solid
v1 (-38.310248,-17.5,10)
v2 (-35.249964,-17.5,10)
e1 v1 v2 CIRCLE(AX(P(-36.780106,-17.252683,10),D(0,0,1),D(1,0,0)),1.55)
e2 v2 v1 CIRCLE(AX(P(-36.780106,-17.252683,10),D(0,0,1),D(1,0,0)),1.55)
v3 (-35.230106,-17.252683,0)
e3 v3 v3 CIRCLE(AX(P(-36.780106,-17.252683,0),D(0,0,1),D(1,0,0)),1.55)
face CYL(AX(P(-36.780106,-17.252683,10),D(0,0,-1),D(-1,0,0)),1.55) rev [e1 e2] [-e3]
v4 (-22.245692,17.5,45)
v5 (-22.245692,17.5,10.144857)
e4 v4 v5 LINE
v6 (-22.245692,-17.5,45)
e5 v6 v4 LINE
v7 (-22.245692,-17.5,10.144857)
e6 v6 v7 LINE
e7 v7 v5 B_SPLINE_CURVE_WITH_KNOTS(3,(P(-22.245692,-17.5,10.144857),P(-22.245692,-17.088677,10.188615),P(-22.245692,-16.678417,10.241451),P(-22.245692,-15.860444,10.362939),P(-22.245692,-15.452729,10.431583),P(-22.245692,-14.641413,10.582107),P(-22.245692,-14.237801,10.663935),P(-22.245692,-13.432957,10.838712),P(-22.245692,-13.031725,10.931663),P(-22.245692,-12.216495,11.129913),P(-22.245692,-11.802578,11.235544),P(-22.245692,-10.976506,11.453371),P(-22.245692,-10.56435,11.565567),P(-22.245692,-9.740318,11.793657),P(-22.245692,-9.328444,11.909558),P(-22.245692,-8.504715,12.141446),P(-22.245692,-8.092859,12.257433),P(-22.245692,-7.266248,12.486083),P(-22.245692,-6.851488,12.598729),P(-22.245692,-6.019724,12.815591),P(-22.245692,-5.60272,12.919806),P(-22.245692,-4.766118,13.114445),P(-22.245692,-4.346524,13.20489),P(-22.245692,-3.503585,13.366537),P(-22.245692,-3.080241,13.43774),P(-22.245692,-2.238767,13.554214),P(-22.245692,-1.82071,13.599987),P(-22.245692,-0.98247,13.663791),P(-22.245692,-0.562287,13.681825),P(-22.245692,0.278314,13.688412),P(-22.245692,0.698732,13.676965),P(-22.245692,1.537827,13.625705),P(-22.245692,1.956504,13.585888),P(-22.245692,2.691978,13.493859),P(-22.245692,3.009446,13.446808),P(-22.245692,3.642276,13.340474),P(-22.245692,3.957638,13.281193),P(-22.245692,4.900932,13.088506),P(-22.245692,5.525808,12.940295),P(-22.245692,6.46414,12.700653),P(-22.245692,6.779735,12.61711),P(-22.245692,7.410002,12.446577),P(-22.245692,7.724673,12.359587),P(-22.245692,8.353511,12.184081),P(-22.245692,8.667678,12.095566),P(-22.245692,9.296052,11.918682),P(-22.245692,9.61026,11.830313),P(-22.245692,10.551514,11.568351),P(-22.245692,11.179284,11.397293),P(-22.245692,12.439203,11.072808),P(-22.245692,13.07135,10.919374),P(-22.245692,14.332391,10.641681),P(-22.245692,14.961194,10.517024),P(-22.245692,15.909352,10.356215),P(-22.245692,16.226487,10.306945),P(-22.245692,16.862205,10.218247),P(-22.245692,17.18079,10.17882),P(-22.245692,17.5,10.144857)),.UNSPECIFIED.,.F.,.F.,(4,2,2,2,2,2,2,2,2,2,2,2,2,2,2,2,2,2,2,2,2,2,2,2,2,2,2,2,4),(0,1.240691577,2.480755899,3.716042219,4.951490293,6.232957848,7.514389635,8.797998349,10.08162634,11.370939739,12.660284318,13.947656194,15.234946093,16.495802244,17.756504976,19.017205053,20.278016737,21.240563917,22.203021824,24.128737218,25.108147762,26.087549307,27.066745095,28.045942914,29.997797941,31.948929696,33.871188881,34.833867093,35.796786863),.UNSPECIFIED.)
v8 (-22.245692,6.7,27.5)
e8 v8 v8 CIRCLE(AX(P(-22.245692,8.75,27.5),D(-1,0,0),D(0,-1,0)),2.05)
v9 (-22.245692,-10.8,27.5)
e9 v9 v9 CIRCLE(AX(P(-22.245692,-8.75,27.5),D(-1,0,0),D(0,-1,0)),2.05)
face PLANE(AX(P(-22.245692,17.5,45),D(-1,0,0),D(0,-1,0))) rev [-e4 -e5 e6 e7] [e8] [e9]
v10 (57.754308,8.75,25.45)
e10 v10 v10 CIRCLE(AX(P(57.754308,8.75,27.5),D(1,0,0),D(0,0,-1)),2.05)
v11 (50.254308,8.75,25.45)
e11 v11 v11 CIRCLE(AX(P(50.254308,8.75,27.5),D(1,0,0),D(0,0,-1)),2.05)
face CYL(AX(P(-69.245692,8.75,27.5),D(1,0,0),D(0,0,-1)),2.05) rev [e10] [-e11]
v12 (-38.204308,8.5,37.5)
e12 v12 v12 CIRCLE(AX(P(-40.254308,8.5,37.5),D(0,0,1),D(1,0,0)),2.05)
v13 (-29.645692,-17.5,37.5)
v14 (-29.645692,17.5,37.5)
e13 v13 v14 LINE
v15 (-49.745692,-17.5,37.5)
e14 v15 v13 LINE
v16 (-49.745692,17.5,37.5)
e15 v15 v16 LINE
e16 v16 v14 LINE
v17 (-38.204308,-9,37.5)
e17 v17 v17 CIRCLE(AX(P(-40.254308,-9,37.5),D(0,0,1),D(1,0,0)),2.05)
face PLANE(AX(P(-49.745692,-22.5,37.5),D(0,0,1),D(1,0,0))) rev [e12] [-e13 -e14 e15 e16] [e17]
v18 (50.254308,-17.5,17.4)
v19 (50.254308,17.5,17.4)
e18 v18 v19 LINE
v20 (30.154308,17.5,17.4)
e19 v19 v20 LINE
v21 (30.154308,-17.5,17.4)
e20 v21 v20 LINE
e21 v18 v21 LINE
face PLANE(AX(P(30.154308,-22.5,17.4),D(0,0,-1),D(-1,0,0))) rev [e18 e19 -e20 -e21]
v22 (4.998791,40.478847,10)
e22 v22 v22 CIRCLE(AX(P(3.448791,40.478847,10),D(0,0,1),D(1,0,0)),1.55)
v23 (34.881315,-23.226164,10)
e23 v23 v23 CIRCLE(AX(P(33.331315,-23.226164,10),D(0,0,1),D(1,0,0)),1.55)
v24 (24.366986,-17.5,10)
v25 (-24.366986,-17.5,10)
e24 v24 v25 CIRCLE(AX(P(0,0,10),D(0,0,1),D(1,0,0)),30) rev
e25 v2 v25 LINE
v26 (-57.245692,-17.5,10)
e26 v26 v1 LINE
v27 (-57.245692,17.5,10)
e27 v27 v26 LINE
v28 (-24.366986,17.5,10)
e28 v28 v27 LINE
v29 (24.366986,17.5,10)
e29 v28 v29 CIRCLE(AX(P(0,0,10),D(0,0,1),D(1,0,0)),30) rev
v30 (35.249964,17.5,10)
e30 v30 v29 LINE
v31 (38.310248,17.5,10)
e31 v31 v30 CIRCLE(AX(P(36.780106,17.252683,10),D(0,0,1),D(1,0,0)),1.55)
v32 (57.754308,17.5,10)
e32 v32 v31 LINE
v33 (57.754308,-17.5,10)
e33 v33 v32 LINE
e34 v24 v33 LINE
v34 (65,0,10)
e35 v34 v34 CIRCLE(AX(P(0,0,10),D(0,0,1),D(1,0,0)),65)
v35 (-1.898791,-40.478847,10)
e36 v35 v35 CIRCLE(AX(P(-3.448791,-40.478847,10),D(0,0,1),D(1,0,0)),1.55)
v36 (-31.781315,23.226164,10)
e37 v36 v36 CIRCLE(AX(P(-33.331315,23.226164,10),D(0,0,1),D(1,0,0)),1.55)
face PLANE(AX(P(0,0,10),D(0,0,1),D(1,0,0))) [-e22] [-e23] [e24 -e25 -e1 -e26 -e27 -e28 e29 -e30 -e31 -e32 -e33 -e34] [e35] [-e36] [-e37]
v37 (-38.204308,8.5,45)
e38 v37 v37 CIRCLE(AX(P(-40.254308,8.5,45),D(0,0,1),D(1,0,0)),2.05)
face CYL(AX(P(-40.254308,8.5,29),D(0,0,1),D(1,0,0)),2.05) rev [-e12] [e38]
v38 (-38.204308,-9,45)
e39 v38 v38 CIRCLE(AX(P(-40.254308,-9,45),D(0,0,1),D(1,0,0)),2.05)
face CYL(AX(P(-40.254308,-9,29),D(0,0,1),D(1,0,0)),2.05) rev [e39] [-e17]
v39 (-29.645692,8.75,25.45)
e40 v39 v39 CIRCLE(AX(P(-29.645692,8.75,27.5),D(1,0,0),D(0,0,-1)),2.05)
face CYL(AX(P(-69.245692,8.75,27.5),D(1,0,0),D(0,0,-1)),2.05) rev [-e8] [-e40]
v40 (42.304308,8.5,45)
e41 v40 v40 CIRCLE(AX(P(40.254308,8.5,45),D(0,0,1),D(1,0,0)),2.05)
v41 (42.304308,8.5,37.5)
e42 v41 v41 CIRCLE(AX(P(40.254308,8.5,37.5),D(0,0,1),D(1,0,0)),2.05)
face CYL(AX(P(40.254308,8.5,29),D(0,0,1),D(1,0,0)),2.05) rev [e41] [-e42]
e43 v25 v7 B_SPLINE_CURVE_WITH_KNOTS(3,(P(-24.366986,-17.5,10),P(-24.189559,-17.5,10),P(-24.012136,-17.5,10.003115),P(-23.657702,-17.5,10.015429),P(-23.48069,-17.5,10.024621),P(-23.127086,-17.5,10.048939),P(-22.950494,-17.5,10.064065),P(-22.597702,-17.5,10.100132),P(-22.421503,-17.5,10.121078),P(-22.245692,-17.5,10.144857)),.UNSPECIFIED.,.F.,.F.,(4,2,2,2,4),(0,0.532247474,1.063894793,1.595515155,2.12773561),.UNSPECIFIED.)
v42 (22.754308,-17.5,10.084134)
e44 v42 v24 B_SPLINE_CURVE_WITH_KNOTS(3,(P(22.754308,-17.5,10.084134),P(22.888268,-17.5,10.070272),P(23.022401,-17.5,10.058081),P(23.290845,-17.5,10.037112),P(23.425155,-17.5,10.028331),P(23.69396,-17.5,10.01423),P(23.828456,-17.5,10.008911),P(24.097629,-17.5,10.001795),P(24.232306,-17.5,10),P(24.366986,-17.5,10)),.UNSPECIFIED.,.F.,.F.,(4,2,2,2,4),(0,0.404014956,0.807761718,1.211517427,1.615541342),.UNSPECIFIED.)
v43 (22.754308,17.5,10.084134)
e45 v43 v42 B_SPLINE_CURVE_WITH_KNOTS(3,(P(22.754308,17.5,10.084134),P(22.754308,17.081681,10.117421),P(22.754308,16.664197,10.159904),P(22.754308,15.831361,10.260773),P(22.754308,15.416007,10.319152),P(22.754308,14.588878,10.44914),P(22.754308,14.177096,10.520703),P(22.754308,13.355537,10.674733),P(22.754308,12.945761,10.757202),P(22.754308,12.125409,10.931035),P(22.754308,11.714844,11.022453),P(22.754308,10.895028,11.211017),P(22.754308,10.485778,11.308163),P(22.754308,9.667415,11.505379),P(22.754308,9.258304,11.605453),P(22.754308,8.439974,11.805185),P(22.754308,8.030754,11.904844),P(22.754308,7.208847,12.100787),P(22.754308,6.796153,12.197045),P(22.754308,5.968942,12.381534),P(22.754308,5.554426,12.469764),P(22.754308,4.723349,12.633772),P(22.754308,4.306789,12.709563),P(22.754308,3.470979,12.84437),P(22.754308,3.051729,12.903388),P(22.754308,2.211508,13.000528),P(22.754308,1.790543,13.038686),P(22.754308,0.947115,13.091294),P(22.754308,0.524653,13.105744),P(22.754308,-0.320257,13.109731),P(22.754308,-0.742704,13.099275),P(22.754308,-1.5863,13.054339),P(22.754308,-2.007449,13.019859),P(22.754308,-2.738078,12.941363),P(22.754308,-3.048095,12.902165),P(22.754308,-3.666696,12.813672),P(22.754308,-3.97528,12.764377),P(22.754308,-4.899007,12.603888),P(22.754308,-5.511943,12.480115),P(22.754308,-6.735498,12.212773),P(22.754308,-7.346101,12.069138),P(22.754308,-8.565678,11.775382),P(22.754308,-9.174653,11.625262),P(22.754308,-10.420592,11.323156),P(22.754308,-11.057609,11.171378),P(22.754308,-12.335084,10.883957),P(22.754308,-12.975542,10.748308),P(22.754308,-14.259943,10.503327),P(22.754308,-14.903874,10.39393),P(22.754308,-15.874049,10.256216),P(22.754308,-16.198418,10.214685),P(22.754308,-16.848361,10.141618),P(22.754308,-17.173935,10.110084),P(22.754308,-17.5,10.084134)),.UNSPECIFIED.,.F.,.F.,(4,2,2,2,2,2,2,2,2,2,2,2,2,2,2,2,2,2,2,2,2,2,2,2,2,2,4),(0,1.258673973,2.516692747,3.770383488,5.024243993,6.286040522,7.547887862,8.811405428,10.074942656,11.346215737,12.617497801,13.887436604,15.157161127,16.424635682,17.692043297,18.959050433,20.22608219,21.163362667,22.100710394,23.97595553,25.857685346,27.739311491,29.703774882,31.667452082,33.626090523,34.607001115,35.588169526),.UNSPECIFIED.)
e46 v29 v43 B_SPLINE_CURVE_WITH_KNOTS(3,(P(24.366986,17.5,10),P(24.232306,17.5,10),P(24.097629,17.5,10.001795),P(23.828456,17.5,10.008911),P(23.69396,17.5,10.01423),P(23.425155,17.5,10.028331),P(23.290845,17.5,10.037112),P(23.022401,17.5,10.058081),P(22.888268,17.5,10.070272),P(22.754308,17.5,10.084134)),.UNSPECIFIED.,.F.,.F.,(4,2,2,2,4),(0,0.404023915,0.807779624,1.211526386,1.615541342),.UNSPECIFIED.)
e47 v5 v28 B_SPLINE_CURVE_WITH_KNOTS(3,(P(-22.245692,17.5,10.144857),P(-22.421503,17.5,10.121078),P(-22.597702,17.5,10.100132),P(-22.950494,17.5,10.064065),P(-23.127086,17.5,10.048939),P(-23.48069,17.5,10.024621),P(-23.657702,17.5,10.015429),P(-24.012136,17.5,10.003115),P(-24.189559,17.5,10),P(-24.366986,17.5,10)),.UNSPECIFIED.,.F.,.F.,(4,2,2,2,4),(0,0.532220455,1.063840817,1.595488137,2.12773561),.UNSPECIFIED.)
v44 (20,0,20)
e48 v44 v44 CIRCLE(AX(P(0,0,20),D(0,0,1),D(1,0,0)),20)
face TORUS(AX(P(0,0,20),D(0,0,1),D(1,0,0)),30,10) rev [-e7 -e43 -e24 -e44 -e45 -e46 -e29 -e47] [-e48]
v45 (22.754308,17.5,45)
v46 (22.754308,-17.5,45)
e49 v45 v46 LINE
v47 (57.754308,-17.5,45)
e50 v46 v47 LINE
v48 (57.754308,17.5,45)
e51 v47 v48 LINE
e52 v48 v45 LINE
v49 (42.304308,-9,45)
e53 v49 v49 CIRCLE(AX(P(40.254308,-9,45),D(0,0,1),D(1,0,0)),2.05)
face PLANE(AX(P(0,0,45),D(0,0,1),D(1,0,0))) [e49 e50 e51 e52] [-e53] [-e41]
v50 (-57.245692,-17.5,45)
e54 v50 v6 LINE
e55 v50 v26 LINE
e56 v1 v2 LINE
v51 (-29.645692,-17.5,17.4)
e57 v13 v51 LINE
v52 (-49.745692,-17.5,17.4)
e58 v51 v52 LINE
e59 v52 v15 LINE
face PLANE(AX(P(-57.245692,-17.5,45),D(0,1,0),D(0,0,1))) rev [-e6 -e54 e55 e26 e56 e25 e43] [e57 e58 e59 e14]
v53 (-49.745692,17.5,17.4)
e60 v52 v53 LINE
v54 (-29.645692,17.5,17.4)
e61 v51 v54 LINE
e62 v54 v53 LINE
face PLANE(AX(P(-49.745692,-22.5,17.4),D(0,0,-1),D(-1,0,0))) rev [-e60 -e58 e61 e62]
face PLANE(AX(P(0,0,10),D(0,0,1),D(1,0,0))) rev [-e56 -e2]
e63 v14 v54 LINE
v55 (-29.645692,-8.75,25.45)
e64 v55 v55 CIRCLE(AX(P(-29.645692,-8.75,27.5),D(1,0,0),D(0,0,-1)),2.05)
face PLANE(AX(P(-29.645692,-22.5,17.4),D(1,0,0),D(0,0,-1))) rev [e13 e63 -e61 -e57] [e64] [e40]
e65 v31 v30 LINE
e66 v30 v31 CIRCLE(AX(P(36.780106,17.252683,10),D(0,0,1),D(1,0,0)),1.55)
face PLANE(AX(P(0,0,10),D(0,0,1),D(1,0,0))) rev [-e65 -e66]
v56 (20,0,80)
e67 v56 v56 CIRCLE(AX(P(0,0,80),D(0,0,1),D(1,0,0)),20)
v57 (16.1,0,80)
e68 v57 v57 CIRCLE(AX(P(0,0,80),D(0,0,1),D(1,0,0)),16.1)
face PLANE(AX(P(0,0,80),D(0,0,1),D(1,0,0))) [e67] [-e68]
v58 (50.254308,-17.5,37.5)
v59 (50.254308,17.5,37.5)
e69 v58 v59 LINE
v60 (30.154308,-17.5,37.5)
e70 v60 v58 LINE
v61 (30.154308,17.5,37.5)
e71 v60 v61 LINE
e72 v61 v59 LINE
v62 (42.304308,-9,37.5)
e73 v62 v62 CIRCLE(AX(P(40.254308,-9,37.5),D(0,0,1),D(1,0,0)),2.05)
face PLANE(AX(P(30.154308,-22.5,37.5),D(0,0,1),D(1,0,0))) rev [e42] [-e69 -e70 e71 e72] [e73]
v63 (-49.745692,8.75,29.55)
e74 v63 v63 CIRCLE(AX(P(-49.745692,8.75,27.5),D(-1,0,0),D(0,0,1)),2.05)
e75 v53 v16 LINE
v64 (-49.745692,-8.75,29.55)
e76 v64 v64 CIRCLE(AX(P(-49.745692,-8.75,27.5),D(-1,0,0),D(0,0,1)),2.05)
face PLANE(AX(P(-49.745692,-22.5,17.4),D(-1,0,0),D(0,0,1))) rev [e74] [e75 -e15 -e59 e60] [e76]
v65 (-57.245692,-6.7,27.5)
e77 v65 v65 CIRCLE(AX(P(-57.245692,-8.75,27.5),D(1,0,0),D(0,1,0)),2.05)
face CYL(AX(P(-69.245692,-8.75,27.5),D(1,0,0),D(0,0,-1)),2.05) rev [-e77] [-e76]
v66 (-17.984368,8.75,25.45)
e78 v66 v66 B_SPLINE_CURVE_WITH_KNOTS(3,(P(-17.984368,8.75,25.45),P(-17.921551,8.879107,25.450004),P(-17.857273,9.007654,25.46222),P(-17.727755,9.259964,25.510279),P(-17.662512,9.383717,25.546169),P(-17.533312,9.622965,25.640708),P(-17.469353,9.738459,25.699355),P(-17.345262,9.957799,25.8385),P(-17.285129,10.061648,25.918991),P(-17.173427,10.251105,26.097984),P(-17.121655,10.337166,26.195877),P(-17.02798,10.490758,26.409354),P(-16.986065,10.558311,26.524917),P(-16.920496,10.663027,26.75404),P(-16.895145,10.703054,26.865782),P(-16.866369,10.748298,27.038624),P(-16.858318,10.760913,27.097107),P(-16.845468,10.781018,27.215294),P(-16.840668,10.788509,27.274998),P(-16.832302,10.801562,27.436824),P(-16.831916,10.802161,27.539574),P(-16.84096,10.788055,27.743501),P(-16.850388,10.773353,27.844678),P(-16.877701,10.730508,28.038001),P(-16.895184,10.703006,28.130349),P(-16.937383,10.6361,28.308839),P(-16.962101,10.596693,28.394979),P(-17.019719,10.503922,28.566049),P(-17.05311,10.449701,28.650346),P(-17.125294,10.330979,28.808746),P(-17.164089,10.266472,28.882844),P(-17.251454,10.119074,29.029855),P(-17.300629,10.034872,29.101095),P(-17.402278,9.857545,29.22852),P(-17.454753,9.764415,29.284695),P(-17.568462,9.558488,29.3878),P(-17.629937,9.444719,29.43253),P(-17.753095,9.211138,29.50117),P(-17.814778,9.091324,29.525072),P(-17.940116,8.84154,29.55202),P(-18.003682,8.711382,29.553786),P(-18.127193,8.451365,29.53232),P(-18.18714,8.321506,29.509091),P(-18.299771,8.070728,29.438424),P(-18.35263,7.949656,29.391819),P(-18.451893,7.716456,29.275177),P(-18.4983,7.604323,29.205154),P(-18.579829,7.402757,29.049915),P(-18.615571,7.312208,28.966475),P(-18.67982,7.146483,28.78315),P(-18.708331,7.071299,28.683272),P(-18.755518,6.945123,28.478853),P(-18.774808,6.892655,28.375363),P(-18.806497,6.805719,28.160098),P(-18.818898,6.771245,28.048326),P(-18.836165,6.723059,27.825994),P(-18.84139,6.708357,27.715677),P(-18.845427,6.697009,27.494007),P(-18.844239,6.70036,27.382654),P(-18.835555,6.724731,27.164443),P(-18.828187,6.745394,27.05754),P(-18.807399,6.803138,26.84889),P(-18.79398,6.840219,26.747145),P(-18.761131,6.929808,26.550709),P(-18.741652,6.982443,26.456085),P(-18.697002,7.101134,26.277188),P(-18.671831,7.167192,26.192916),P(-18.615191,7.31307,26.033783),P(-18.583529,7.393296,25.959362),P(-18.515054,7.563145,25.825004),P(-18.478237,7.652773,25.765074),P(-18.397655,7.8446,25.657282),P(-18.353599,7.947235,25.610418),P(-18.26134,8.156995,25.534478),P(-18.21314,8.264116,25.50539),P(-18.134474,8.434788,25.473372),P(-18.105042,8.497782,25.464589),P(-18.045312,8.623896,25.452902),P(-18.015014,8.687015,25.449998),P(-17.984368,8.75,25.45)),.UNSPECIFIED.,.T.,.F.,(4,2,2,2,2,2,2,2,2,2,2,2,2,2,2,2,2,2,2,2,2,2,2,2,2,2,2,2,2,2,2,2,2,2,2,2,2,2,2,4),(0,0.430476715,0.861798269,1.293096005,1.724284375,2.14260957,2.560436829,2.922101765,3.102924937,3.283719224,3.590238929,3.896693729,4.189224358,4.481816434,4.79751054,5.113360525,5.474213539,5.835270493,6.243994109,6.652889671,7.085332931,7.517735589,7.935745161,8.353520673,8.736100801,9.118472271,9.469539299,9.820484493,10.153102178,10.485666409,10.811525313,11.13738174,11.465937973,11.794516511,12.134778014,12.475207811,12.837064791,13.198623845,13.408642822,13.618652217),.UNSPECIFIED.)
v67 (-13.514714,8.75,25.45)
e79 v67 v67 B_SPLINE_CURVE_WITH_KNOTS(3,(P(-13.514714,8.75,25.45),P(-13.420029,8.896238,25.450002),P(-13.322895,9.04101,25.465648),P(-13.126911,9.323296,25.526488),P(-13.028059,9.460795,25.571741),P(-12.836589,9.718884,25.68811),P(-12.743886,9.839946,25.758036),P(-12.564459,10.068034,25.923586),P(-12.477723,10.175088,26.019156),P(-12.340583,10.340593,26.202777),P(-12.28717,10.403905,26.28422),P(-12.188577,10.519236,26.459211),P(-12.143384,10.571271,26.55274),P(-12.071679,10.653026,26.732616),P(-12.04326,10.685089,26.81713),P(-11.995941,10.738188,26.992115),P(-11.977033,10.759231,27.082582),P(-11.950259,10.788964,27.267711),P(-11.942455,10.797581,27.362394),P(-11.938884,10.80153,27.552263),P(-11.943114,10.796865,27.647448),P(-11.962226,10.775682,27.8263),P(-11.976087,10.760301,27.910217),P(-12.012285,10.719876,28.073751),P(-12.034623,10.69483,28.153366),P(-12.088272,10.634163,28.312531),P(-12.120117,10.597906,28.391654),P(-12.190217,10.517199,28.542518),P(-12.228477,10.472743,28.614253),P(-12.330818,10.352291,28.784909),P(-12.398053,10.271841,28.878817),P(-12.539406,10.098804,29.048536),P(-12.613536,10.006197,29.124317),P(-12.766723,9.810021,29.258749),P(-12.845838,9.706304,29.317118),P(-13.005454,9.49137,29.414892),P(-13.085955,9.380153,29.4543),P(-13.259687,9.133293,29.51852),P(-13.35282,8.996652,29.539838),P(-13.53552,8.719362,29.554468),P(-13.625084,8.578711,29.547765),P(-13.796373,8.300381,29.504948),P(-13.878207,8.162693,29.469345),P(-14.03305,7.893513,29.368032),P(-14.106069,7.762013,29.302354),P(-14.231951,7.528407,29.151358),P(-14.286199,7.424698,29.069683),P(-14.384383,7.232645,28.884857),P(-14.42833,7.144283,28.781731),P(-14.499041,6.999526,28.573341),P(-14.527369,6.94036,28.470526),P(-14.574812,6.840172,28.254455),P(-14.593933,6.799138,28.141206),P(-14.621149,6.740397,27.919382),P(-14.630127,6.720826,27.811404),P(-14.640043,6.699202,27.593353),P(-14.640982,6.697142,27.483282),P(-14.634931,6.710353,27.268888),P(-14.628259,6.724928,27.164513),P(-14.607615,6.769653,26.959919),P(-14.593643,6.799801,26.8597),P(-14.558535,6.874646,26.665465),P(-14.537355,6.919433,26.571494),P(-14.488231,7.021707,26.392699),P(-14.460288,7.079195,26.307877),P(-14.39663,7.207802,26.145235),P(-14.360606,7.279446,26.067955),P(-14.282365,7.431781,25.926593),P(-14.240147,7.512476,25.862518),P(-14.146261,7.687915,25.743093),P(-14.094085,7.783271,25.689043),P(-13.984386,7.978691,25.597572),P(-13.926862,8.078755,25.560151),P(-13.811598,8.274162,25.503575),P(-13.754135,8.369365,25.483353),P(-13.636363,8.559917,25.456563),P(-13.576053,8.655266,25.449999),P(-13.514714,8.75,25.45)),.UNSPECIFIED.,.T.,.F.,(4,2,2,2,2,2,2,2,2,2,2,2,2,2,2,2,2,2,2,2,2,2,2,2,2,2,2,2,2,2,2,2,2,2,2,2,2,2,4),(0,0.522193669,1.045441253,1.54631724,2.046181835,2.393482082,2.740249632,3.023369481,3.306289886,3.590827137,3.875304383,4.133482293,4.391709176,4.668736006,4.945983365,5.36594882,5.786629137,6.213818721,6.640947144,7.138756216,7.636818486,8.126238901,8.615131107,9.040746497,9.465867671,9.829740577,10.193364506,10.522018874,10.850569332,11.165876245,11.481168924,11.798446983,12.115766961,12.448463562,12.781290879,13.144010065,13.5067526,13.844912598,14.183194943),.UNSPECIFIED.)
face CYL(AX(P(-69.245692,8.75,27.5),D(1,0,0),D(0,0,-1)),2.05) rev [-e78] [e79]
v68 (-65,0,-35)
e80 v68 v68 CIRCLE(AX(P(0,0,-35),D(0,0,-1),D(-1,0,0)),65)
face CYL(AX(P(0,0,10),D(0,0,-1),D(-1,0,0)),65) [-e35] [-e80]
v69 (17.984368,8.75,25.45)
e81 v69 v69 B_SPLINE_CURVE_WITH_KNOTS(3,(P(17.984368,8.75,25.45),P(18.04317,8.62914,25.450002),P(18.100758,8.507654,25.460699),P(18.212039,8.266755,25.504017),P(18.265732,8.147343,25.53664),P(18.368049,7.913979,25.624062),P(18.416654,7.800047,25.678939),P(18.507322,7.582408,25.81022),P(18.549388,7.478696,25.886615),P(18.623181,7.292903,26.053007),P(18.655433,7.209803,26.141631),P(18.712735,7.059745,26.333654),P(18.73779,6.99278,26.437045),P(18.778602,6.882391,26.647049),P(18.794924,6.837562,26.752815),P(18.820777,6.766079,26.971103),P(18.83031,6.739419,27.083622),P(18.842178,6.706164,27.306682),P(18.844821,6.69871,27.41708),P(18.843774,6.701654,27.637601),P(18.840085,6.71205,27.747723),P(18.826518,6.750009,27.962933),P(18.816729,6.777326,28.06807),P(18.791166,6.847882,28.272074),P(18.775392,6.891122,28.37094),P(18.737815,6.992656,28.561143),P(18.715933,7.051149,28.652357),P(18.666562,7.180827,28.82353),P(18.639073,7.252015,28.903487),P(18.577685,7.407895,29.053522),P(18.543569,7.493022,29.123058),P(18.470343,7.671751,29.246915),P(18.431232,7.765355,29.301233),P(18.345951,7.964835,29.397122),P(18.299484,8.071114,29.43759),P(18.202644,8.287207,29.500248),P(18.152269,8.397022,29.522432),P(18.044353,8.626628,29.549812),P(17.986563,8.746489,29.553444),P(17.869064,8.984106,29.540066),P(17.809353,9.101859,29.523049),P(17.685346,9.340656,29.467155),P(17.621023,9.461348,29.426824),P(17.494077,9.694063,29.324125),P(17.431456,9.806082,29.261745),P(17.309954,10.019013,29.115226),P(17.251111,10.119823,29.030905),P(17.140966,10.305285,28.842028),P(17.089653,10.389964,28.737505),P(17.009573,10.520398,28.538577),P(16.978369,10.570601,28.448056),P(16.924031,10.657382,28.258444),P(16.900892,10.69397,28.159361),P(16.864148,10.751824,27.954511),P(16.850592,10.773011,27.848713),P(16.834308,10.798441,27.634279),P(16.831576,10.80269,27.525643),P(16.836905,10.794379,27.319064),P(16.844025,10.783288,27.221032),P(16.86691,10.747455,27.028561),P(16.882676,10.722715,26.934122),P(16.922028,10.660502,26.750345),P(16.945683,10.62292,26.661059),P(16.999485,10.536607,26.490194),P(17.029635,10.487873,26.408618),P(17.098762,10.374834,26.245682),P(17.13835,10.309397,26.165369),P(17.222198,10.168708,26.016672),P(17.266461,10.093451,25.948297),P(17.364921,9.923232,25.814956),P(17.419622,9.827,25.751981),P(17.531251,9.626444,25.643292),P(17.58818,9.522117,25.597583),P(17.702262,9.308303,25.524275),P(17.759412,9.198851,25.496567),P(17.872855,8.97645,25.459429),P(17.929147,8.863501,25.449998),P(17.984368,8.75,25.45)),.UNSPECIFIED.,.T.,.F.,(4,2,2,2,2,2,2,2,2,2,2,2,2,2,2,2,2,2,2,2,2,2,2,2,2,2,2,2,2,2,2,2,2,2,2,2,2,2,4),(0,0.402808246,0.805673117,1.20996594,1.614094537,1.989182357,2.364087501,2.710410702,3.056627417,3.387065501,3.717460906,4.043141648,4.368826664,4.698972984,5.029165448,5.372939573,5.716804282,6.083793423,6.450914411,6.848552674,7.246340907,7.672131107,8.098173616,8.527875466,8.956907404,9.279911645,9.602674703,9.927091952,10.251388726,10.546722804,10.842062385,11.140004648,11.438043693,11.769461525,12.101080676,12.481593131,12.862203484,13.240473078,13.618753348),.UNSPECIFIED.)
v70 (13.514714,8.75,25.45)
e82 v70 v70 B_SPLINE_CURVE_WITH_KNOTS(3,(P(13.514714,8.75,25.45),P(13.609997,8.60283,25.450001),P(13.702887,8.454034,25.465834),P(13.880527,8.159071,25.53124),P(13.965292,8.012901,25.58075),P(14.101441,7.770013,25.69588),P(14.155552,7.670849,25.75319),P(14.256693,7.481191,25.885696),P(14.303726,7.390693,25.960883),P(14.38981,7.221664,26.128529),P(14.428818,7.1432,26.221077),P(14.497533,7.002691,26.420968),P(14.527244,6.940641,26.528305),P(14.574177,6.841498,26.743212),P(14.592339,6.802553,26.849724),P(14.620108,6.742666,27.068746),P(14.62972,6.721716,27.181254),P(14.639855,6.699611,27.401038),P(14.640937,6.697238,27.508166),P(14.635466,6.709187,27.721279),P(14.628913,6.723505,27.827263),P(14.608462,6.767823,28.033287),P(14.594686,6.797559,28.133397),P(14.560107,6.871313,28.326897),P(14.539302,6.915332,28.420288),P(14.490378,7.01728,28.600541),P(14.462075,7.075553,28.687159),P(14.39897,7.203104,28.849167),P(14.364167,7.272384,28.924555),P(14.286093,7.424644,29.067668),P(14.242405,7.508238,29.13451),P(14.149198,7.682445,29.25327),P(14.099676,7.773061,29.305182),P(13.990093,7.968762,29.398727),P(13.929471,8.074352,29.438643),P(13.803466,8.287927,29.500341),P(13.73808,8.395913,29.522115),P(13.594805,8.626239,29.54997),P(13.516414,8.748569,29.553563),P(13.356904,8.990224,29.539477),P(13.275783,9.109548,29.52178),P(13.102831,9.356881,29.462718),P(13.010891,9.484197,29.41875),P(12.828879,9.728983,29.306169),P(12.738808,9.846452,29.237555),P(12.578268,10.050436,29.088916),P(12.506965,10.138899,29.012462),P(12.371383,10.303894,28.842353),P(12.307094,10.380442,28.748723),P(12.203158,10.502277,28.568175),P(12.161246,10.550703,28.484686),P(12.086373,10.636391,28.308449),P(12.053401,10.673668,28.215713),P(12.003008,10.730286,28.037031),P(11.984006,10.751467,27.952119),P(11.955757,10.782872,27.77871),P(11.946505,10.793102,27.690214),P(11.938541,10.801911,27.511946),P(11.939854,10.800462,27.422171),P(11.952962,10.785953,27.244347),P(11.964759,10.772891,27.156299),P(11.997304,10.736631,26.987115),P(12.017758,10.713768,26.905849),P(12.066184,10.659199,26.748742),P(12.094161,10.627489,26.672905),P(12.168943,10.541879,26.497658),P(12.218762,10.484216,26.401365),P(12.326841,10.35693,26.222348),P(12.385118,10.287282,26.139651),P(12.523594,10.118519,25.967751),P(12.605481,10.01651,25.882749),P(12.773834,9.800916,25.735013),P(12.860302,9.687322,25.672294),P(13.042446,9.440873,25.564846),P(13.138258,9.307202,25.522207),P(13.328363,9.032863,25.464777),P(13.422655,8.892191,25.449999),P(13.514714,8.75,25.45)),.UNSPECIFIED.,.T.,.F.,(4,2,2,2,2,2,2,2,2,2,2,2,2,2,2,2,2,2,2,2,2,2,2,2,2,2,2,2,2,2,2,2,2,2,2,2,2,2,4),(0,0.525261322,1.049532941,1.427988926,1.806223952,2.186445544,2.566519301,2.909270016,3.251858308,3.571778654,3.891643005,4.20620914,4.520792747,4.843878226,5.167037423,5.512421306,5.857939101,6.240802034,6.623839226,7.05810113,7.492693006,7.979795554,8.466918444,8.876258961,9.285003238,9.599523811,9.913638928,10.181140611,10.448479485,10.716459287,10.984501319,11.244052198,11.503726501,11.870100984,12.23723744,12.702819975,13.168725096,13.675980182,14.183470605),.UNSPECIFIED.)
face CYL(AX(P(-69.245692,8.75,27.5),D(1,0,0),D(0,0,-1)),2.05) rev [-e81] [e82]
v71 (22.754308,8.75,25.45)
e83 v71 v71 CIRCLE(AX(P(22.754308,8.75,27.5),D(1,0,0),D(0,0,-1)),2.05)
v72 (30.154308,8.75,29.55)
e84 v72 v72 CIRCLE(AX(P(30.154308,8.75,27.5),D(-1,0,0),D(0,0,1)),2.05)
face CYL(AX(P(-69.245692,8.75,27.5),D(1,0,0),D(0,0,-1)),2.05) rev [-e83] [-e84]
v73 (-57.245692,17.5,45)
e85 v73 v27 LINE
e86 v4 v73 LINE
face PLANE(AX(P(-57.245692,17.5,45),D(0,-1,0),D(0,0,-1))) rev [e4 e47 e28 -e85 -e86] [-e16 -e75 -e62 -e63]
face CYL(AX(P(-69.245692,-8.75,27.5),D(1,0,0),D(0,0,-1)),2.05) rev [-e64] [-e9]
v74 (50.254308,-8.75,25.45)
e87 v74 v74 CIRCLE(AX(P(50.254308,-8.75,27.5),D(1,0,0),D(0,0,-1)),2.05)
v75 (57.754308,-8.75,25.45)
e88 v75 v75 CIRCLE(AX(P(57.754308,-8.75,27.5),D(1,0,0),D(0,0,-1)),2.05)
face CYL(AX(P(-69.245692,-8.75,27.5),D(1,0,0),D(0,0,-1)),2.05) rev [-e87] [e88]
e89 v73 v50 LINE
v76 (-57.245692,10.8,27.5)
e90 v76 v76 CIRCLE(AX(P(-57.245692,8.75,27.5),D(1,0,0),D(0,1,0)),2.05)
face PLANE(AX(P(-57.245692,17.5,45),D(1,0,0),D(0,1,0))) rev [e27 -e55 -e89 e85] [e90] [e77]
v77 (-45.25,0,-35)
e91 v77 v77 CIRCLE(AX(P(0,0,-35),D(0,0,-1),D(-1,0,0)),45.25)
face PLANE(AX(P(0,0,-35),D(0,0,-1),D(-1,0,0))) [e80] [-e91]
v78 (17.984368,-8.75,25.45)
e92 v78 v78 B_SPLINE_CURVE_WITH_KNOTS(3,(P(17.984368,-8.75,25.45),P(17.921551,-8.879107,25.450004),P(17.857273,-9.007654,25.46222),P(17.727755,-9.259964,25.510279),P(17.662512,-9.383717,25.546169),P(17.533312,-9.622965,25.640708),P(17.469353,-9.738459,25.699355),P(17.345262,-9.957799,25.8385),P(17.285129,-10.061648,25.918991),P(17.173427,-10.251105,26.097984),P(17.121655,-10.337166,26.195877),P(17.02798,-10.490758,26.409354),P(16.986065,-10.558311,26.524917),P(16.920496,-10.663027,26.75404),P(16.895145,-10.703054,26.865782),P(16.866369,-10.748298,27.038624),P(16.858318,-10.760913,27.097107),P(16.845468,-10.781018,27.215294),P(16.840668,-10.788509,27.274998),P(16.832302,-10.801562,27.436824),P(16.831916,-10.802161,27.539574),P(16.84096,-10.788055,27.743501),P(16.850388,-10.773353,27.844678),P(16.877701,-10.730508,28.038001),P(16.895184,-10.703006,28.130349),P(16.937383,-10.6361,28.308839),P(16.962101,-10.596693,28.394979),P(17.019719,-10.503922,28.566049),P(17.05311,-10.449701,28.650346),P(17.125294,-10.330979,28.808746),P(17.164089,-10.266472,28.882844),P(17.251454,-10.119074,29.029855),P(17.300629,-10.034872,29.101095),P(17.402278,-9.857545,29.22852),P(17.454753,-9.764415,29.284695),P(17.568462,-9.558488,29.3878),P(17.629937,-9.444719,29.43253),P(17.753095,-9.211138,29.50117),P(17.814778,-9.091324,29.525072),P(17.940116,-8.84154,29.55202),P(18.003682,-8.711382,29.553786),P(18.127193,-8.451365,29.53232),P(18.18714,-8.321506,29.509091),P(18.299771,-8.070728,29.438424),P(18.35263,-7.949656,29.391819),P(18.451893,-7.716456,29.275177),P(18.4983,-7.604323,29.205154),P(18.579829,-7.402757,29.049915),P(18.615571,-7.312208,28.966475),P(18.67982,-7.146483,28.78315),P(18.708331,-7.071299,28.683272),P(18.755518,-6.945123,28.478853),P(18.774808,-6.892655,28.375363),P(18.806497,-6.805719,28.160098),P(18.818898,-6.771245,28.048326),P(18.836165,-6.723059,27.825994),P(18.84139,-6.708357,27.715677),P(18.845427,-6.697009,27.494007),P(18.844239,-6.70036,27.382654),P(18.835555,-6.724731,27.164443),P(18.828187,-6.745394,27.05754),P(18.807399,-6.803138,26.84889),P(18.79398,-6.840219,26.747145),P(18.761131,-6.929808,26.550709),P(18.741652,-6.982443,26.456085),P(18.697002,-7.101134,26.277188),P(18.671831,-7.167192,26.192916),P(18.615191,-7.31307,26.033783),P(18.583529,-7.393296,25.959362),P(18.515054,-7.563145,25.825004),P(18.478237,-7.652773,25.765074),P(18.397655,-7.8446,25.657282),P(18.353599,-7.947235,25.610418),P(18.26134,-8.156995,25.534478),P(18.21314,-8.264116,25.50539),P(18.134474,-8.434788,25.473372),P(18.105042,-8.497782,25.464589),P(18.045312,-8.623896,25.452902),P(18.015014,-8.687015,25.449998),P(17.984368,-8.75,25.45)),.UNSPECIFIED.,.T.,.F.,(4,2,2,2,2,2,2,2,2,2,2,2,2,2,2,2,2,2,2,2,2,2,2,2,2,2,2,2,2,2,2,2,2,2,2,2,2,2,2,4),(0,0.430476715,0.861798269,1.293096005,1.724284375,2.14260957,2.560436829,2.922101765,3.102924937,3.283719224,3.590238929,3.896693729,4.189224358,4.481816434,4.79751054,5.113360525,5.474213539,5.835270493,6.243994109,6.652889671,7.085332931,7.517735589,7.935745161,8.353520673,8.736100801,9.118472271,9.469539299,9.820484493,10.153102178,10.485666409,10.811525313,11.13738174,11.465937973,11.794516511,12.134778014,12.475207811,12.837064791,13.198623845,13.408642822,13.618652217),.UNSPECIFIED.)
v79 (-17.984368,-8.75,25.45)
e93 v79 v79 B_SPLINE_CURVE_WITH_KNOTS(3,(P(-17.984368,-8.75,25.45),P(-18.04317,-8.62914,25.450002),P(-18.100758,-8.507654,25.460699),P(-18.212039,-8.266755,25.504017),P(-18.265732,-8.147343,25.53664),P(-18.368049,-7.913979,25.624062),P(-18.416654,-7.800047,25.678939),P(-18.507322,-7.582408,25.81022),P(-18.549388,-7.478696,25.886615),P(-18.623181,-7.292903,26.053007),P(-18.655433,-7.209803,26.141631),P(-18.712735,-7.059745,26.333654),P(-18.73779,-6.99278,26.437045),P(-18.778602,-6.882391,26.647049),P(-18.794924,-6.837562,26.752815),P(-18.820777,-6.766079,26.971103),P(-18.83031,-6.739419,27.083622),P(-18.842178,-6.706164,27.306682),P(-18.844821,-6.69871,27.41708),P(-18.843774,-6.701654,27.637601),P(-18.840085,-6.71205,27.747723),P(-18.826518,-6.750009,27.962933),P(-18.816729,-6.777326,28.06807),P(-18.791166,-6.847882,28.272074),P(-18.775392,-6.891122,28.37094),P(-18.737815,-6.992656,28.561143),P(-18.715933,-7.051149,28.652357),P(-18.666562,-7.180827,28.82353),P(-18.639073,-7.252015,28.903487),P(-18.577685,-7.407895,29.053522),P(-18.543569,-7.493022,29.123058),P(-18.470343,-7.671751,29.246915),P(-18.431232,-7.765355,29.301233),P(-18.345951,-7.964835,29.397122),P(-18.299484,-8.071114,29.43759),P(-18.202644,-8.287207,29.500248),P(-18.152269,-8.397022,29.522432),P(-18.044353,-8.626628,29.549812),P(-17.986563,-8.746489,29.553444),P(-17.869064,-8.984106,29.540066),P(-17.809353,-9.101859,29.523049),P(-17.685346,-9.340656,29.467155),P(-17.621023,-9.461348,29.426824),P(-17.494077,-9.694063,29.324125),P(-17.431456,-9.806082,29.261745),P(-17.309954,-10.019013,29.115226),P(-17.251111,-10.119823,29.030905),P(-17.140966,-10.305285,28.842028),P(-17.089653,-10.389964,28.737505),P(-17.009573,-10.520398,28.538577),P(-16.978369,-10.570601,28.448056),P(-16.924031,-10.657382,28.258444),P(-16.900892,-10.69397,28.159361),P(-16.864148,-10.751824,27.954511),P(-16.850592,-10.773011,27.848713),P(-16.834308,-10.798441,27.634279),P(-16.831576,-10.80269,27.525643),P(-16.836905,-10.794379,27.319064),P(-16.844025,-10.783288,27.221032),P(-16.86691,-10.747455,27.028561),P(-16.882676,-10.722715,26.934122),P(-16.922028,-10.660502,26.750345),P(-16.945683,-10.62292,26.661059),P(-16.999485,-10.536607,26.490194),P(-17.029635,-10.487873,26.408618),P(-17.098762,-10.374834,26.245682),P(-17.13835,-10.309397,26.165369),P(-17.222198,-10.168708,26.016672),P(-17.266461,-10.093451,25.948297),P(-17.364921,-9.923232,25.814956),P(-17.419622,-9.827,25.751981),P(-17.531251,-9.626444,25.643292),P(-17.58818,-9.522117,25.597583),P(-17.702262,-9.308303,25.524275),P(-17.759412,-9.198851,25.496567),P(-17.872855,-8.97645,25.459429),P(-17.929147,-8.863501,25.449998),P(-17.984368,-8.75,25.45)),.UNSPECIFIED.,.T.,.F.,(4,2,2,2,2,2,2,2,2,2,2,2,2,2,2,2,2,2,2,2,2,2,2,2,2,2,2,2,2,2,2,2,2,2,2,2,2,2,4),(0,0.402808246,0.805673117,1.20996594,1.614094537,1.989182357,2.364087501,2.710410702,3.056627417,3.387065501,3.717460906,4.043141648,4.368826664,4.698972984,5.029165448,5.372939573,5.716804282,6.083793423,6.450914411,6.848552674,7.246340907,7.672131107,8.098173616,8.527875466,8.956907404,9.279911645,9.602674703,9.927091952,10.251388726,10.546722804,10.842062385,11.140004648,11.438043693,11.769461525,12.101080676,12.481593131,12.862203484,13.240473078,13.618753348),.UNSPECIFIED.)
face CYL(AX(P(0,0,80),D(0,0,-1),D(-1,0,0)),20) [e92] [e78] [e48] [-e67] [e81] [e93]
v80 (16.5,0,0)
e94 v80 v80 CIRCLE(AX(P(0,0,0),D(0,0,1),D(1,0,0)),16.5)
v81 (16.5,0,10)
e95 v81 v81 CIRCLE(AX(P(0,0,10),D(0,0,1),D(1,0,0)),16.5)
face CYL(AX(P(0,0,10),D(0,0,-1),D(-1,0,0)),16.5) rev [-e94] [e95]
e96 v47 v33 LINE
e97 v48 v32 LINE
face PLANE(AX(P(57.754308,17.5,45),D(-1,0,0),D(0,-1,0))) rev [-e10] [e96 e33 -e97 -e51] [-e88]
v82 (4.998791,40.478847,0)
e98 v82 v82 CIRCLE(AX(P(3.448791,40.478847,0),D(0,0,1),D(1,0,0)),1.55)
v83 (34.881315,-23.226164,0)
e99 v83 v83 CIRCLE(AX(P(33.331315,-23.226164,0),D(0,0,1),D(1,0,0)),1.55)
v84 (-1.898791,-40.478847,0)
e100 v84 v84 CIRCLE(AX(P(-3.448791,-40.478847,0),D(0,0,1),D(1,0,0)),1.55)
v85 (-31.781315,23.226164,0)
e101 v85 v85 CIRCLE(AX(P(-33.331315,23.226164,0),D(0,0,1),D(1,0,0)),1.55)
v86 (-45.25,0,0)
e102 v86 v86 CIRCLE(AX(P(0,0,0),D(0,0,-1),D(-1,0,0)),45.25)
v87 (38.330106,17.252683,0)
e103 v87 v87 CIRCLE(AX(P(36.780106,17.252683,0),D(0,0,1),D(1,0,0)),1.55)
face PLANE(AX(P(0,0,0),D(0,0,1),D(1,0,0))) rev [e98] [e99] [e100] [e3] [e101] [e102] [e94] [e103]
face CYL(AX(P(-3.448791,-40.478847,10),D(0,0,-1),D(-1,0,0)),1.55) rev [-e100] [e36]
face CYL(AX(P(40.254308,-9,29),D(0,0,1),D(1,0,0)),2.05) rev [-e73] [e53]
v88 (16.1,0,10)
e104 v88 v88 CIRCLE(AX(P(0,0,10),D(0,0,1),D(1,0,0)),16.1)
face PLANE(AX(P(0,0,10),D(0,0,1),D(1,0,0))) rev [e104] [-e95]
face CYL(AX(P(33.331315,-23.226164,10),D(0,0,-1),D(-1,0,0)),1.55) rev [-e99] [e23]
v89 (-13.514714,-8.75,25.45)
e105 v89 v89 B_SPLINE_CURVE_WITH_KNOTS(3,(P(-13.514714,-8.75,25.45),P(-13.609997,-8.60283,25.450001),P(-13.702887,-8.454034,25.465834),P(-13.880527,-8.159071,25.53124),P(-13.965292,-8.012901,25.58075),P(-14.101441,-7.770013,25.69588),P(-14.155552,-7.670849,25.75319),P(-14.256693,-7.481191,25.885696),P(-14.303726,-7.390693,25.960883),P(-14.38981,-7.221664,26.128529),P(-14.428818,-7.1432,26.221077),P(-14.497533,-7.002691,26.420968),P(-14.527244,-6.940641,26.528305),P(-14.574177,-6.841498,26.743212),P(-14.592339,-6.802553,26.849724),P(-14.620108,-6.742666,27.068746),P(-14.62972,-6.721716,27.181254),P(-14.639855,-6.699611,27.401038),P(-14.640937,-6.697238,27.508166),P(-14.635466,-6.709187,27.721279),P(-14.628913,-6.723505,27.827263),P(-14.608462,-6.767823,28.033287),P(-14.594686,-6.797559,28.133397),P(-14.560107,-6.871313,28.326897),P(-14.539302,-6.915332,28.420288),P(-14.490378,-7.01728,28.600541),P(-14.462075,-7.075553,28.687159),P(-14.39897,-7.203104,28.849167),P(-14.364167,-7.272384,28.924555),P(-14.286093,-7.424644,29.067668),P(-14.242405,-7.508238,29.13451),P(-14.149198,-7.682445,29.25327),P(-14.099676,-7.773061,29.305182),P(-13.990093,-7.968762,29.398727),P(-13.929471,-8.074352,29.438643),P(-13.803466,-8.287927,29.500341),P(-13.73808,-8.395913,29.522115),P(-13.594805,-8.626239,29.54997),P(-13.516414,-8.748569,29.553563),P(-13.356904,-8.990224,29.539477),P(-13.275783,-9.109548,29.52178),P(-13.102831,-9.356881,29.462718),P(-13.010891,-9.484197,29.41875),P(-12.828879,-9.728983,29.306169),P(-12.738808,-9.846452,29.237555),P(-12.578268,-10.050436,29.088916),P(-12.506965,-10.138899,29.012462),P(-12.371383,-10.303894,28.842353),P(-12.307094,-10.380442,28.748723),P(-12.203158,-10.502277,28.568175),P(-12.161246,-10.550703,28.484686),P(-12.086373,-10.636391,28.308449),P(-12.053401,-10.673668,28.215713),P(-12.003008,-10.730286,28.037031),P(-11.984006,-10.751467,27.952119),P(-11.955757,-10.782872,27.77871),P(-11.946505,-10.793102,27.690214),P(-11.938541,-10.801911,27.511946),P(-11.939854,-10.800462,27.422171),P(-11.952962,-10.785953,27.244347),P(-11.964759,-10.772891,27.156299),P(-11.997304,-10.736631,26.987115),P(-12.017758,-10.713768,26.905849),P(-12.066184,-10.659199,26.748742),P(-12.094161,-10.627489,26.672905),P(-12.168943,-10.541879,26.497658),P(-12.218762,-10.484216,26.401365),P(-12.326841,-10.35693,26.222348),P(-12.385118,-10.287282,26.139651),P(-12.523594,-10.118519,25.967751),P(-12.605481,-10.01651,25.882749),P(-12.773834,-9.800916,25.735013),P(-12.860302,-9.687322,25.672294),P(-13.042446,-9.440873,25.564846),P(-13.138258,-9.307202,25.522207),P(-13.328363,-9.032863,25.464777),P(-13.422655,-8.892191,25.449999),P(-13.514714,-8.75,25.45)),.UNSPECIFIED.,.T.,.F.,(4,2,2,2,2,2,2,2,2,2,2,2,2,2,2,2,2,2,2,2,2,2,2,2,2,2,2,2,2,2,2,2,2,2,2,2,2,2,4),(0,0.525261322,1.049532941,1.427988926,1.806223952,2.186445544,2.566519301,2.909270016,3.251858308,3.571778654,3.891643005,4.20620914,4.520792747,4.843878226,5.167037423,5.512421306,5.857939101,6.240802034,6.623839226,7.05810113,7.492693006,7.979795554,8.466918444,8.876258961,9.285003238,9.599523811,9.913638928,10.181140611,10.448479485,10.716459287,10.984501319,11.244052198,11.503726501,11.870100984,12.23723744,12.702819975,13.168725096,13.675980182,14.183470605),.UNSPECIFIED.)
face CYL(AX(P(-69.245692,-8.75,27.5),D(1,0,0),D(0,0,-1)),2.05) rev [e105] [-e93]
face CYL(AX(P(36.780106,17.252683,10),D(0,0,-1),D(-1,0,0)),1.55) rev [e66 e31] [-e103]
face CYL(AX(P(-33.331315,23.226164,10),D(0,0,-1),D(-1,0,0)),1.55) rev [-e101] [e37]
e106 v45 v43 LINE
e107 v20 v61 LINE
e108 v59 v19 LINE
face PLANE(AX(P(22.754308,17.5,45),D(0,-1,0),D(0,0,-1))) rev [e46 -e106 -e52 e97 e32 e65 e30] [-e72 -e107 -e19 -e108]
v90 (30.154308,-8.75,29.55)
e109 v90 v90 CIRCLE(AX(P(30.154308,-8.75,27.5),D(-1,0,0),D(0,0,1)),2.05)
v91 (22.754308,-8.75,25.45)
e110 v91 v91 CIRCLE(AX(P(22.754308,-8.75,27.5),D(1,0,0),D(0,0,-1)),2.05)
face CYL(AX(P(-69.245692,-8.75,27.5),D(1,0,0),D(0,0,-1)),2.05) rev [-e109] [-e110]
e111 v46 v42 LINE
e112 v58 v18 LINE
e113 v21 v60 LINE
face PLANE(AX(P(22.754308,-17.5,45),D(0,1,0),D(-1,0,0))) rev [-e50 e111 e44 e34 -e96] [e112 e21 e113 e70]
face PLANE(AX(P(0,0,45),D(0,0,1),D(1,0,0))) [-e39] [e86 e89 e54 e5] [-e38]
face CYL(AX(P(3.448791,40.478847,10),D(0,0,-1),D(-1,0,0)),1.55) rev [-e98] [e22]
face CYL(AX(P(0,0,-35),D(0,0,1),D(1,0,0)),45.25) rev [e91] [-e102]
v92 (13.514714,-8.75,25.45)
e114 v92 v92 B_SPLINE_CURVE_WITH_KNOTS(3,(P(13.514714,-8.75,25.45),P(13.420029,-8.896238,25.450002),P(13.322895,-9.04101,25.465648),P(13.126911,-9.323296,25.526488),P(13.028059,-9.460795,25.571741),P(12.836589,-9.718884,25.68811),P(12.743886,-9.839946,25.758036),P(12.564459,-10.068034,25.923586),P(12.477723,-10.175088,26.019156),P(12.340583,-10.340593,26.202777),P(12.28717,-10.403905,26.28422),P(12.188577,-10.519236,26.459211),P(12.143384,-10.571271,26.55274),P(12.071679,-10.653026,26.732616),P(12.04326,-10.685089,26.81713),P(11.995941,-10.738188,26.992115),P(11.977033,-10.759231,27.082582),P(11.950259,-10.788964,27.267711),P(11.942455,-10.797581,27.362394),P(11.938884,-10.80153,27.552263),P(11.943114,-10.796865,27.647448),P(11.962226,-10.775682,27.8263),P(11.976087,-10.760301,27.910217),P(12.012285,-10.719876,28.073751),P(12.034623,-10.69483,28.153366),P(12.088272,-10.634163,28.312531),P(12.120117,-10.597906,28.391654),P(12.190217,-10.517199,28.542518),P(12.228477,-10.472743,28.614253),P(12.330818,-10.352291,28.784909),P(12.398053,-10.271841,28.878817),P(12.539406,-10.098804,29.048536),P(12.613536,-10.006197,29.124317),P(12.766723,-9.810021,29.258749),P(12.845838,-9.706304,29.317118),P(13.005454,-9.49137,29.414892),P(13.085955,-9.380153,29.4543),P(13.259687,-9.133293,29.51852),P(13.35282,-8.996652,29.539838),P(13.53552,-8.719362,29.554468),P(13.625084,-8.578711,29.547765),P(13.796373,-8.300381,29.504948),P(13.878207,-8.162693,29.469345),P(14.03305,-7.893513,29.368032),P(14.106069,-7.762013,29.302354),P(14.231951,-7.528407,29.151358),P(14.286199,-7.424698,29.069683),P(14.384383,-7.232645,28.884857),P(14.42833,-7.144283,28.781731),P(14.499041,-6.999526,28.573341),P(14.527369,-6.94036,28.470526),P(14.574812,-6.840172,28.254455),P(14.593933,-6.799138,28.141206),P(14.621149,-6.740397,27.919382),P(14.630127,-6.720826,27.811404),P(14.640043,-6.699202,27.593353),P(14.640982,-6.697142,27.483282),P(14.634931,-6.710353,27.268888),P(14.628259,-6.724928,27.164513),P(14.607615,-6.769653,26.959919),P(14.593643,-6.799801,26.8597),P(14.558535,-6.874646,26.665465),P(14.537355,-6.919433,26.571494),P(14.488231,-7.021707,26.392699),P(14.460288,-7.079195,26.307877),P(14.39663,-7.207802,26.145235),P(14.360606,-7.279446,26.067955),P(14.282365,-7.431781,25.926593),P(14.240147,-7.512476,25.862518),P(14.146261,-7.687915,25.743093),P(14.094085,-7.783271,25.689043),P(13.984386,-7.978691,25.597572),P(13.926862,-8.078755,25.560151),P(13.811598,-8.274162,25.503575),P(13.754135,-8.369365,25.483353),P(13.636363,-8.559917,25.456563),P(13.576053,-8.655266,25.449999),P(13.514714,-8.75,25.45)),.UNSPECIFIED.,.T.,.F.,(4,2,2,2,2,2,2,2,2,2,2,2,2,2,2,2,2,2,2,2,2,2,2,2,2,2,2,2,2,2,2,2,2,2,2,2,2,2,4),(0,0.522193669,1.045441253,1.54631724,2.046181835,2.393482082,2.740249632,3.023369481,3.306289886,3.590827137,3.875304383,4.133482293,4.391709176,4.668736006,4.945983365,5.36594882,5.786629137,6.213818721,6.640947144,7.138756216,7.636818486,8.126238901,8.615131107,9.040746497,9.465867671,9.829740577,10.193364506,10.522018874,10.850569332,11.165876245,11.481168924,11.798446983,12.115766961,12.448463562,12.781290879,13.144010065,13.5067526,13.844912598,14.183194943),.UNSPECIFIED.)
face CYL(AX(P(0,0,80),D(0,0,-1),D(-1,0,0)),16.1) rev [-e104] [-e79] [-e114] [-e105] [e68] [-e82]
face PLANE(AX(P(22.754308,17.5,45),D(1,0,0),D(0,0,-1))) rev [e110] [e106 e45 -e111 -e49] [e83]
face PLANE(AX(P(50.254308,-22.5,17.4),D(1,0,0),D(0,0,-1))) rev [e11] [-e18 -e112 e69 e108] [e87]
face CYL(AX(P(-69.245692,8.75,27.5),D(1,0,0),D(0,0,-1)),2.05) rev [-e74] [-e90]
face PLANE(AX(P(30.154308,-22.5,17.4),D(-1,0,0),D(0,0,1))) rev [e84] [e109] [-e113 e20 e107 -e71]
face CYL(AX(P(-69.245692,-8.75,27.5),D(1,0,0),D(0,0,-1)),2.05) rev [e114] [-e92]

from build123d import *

# Parameters (mm, degrees)
SKETCH1_R               = 65
SKETCH1_R_2             = 1.55
SKETCH1_R_3             = 16.5
BOSS_EXTRUDE1_DEPTH     = 10
SKETCH2_R               = 20
SKETCH2_R_2             = 16.1
BOSS_EXTRUDE2_DEPTH     = 70
BOSS_EXTRUDE3_START     = 35
SKETCH3_R               = 65
SKETCH3_R_2             = 45.25
BOSS_EXTRUDE3_DEPTH     = 35
SKETCH4_W               = 35
SKETCH4_H               = 35
BOSS_EXTRUDE4_DEPTH     = 35
SKETCH5_W               = 20.1
SKETCH5_H               = 20.1
CUT_EXTRUDE1_DEPTH      = 40
FILLET1_R               = 10
SKETCH6_R               = 2.05
CUT_EXTRUDE2_DEPTH      = 127
CUT_EXTRUDE3_DEPTH      = 1
CUT_EXTRUDE3_DEPTH_BACK = 16
SKETCH7_R               = 2.05


with BuildPart() as part:
    # Sketch1 → Boss-Extrude1 (new body)
    with BuildSketch(Plane.XY):
        Circle(SKETCH1_R)
        with Locations((-3.448790634, -40.478847481)):
            Circle(SKETCH1_R_2, mode=Mode.SUBTRACT)
        Circle(SKETCH1_R_3, mode=Mode.SUBTRACT)
        with Locations((-36.780105552, -17.252683439)):
            Circle(SKETCH1_R_2, mode=Mode.SUBTRACT)
        with Locations((-33.331314918, 23.226164042)):
            Circle(SKETCH1_R_2, mode=Mode.SUBTRACT)
        with Locations((3.448790634, 40.478847481)):
            Circle(SKETCH1_R_2, mode=Mode.SUBTRACT)
        with Locations((36.780105552, 17.252683439)):
            Circle(SKETCH1_R_2, mode=Mode.SUBTRACT)
        with Locations((33.331314918, -23.226164042)):
            Circle(SKETCH1_R_2, mode=Mode.SUBTRACT)
    extrude(amount=BOSS_EXTRUDE1_DEPTH)

    # Sketch2 → Boss-Extrude2 (add)
    with BuildSketch(Plane.XY.offset(10)):
        Circle(SKETCH2_R)
        Circle(SKETCH2_R_2, mode=Mode.SUBTRACT)
    extrude(amount=BOSS_EXTRUDE2_DEPTH)

    # Sketch3 → Boss-Extrude3 (add)
    with BuildSketch(Plane(origin=(0, 0, 0), x_dir=(-1, 0, 0), z_dir=(0, 0, -1)).offset(BOSS_EXTRUDE3_START)):
        Circle(SKETCH3_R)
        Circle(SKETCH3_R_2, mode=Mode.SUBTRACT)
    extrude(amount=-BOSS_EXTRUDE3_DEPTH)

    # Sketch4 → Boss-Extrude4 (add)
    with BuildSketch(Plane.XY.offset(10)):
        with Locations((-39.74569159, 0)):
            Rectangle(SKETCH4_W, SKETCH4_H)
        with Locations((40.25430841, 0)):
            Rectangle(SKETCH4_W, SKETCH4_H)
    extrude(amount=BOSS_EXTRUDE4_DEPTH)

    # Sketch5 → Cut-Extrude1 (cut)
    with BuildSketch(Plane(origin=(0, 17.5, 0), x_dir=(1, 0, 0), z_dir=(0, 1, 0))):
        with Locations((40.20430841, -27.45)):
            Rectangle(SKETCH5_W, SKETCH5_H)
        with Locations((-39.69569159, -27.45)):
            Rectangle(SKETCH5_W, SKETCH5_H)
    extrude(amount=-CUT_EXTRUDE1_DEPTH, mode=Mode.SUBTRACT)

    # Fillet1
    # the kernel refuses this fillet: 10 mm, written as the material it adds along each edge
    with BuildSketch(Plane(origin=(0, 0, 10), x_dir=(1, 0, 0), z_dir=(0, -1, 0))) as fillet1_piece_1:
        with BuildLine():
            CenterArc((20 + FILLET1_R, FILLET1_R), FILLET1_R, 180, 90)
            Line((20, FILLET1_R), (20, 0))
            Line((20, 0), (20 + FILLET1_R, 0))
        make_face()
    revolve(axis=Axis((0, 0, 10), (0, 0, 1)))

    # Sketch6 → Cut-Extrude2 (cut)
    with BuildSketch(Plane(origin=(57.75430841, 0, 0), x_dir=(0, 0, -1), z_dir=(1, 0, 0))):
        with Locations(Location((-27.5, 8.75, 0), (0, 0, 90))):
            Circle(SKETCH6_R)
        with Locations(Location((-27.5, -8.75, 0), (0, 0, 90))):
            Circle(SKETCH6_R)
    extrude(amount=-CUT_EXTRUDE2_DEPTH, mode=Mode.SUBTRACT)

    # Sketch7 → Cut-Extrude3 (cut, two sides: drawn at the far end of the back side and taken through both)
    with BuildSketch(Plane.XY.offset(45).offset(-CUT_EXTRUDE3_DEPTH_BACK)):
        with Locations((40.25430841, 8.5)):
            Circle(SKETCH7_R)
        with Locations((40.25430841, -9)):
            Circle(SKETCH7_R)
        with Locations((-40.25430841, -9)):
            Circle(SKETCH7_R)
        with Locations((-40.25430841, 8.5)):
            Circle(SKETCH7_R)
    extrude(amount=CUT_EXTRUDE3_DEPTH + CUT_EXTRUDE3_DEPTH_BACK, mode=Mode.SUBTRACT)


solid = part.part
